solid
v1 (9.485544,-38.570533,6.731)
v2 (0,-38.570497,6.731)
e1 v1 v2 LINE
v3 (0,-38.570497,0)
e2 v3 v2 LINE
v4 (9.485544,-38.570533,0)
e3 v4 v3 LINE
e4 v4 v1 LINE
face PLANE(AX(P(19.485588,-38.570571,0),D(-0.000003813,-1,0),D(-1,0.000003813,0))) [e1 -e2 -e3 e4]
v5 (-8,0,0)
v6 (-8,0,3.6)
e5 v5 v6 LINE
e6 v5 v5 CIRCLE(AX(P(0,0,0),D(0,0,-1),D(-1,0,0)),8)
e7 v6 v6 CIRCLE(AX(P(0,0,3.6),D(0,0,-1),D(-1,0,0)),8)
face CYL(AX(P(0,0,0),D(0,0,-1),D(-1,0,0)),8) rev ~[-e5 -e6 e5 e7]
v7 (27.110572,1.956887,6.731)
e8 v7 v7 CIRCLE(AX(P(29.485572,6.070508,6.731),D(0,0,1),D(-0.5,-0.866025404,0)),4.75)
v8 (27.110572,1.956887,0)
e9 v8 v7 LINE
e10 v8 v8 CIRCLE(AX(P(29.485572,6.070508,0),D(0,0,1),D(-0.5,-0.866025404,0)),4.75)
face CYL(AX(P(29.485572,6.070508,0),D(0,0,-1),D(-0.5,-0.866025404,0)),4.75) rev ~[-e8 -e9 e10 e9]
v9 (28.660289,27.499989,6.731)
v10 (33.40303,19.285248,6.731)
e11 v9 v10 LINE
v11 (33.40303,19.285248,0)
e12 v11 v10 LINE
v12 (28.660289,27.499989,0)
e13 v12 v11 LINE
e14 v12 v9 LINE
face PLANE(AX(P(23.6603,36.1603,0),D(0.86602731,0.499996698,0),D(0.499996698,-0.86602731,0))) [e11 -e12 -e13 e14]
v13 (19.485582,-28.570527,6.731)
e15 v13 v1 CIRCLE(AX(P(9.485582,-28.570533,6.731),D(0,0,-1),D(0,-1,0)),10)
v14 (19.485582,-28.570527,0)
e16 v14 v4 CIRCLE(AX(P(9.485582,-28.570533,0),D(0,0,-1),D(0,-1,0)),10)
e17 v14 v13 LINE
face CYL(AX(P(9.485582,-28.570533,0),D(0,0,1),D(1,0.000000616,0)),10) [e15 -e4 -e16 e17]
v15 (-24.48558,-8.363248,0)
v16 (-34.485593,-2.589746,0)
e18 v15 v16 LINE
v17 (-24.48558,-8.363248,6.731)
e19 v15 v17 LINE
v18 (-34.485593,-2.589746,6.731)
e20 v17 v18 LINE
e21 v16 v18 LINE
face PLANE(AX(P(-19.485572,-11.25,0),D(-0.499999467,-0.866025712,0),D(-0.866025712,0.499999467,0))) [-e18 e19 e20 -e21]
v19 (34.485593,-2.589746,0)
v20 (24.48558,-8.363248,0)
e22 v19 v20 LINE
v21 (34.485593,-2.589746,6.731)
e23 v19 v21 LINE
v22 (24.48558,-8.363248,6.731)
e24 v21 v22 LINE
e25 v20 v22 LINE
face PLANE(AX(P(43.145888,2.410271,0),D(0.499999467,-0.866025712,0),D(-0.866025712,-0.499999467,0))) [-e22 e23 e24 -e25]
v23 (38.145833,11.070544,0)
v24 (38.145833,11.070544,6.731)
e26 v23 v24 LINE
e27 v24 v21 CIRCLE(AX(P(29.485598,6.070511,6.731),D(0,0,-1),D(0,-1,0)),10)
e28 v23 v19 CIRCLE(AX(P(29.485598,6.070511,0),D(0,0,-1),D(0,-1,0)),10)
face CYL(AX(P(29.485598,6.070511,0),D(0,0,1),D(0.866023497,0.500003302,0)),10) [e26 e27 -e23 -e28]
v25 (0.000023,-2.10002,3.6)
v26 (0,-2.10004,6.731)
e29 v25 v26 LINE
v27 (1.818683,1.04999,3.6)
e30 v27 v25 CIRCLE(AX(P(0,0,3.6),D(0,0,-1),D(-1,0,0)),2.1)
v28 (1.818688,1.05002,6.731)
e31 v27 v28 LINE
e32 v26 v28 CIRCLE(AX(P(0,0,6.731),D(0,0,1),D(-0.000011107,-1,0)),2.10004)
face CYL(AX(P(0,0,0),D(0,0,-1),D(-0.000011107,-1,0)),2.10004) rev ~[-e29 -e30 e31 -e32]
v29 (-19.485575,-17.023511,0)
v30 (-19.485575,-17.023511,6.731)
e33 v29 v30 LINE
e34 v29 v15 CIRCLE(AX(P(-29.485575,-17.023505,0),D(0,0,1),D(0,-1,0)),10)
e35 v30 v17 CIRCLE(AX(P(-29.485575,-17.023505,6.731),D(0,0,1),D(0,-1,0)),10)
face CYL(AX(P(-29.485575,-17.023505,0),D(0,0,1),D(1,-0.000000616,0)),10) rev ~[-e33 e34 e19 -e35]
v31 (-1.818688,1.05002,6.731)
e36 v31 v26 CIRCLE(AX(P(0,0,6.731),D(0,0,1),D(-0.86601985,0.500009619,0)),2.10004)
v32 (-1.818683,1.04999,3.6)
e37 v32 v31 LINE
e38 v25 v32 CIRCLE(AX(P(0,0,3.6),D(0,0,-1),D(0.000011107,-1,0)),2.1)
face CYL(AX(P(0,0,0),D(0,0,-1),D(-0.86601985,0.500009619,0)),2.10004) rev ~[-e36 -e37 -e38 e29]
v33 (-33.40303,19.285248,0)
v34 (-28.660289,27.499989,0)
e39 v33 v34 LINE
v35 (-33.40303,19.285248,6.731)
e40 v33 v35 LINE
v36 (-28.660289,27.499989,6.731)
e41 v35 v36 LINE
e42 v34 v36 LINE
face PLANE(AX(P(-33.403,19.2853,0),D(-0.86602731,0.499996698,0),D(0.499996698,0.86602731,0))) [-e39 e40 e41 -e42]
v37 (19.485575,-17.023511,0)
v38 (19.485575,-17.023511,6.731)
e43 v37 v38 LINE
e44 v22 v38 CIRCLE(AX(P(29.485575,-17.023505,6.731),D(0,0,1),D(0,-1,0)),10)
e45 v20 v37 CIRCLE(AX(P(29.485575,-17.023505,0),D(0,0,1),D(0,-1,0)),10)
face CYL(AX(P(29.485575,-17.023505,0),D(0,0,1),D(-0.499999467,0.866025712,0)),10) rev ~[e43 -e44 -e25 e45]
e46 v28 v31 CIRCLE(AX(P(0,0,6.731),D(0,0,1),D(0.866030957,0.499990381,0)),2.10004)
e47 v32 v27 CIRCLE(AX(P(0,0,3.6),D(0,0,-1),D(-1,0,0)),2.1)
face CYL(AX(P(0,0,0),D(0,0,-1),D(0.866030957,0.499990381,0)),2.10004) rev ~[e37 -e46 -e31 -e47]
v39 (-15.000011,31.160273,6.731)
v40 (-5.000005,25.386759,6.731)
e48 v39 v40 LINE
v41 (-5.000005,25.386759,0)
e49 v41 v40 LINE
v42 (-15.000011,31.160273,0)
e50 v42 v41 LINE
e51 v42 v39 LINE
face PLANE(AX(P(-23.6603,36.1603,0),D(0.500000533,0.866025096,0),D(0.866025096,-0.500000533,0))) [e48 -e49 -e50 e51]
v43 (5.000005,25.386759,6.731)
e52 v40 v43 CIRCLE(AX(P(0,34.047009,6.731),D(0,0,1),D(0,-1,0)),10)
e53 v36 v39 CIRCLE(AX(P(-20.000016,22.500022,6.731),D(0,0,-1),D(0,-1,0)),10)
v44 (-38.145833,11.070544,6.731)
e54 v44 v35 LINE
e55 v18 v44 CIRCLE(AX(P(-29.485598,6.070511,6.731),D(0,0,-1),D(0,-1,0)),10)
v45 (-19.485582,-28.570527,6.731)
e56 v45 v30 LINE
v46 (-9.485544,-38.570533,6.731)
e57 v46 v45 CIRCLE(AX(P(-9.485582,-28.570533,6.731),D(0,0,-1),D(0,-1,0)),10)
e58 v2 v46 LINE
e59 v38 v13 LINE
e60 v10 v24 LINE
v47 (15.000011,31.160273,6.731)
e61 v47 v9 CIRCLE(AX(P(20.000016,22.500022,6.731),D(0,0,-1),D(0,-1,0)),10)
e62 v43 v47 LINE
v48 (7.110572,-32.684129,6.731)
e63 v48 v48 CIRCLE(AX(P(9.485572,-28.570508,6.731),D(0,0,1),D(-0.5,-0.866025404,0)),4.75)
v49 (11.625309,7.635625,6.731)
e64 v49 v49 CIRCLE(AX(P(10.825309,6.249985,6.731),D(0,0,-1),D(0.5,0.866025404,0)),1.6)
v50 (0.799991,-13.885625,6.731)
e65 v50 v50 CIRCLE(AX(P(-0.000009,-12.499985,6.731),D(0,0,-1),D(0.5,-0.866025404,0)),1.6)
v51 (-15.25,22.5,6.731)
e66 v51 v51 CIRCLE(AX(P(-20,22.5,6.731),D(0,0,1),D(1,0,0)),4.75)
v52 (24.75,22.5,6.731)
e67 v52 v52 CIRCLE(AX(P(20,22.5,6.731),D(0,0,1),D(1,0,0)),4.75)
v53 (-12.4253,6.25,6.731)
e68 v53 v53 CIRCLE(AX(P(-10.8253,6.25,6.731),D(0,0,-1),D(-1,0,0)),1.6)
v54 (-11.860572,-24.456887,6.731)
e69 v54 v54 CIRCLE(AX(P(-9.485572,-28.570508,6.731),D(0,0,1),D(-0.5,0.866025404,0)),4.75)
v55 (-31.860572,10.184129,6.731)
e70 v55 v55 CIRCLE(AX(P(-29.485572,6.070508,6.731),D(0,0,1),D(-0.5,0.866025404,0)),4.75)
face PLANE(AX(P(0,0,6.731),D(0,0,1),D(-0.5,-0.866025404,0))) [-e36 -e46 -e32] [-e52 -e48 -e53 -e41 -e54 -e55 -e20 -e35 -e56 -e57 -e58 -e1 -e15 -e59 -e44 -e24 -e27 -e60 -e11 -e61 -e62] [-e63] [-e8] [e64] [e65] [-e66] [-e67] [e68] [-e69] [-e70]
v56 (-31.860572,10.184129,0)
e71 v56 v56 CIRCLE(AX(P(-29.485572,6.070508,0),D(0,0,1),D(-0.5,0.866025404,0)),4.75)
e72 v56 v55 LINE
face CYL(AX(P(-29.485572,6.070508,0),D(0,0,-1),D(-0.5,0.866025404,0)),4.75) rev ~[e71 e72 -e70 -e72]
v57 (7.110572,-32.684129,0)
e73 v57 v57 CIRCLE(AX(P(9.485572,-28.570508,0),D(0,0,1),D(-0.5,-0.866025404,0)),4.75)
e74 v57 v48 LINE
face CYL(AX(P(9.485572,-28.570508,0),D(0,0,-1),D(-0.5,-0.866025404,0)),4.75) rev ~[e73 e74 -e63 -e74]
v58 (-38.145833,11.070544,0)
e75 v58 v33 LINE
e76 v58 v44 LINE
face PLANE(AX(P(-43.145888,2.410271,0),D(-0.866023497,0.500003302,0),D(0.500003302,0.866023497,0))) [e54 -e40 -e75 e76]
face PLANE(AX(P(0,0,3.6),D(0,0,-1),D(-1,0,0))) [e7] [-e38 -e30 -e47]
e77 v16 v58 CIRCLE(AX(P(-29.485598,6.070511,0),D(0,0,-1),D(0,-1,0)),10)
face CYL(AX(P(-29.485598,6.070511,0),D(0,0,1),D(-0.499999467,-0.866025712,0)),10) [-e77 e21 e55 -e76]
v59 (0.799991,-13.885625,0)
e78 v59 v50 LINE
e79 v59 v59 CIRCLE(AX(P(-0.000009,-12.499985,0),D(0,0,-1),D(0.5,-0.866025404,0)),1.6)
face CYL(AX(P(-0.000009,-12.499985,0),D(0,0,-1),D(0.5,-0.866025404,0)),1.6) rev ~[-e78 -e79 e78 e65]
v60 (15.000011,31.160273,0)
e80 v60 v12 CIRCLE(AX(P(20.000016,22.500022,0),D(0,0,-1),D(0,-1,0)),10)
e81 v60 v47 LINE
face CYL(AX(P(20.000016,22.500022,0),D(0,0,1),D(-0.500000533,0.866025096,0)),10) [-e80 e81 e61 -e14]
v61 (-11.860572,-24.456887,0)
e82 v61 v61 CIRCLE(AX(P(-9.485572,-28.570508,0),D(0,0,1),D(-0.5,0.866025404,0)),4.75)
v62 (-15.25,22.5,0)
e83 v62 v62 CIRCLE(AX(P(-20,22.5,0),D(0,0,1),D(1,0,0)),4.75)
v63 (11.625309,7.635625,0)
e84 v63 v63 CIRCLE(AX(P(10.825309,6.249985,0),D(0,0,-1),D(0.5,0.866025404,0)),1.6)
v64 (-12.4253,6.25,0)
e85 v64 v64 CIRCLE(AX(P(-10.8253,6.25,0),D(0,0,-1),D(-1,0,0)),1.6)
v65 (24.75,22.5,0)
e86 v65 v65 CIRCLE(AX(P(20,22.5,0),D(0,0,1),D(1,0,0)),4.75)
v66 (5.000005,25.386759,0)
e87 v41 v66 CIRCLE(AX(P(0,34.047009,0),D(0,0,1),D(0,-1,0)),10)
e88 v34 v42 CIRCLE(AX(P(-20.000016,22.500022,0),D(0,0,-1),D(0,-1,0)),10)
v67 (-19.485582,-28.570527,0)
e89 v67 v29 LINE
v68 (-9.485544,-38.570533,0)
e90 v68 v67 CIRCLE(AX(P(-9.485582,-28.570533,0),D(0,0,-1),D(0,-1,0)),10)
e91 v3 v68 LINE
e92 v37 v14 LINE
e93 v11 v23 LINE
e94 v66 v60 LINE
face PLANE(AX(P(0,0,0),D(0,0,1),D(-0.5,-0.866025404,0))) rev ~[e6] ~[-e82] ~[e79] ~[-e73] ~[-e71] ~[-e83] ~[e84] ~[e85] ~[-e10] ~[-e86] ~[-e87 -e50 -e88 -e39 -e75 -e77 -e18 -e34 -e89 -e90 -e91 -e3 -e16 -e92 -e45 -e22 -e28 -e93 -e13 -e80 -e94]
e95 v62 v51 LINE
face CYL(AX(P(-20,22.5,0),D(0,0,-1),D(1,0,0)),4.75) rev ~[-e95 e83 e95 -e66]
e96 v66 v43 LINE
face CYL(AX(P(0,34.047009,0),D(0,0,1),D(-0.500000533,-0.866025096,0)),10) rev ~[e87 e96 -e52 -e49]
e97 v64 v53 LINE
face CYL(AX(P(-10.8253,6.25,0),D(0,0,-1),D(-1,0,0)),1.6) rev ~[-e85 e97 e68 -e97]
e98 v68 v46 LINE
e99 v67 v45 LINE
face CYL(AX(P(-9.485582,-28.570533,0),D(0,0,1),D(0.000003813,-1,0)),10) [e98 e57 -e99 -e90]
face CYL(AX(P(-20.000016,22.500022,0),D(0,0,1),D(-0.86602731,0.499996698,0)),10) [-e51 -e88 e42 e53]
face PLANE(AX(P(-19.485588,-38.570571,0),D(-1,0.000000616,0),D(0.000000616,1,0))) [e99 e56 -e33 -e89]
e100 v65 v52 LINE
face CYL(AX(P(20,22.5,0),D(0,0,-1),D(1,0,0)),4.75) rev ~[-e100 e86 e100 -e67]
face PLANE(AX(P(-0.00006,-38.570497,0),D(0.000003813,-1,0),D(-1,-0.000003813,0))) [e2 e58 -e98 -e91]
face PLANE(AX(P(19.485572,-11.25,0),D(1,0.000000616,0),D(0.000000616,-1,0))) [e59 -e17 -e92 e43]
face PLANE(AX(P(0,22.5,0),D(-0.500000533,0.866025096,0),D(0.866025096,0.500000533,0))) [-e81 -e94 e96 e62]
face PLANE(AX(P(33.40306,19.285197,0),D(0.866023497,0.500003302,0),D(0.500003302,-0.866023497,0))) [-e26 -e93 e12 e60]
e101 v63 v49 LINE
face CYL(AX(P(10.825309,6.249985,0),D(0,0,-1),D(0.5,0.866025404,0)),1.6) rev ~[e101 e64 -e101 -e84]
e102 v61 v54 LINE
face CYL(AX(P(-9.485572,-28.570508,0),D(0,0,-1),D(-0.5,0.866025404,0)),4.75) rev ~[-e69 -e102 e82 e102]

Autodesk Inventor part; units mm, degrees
ref_plane "YZ Plane" through (0, 0, 0) normal (1, 0, 0) x (0, 1, 0)
ref_plane "XZ Plane" through (0, 0, 0) normal (0, 1, 0) x (-1, 0, 0)
ref_plane "XY Plane" through (0, 0, 0) normal (0, 0, 1) x (1, 0, 0)
sketch "Sketch1" plane through (0, 0, 0) normal (0, 0, 1) x (1, 0, 0)
  line L0 (0, 0) -> (-33.403, 19.2853)
  line L1 (0, 0) -> (33.403, 19.2853)
  arc A0 (1.8187, 1.05) -> (-1.8187, 1.05) centre (0, 0) ccw
  circle A1 centre (-20, 22.5) radius 4.75
  circle A2 centre (20, 22.5) radius 4.75
  line L2 (0, 0) -> (-27.7881, 0)
  line L3 (-33.403, 19.2853) -> (-23.6603, 36.1603)
  line L4 (23.6603, 36.1603) -> (33.403, 19.2853)
  line L5 (-23.6603, 36.1603) -> (0, 22.5)
  line L6 (0, 22.5) -> (23.6603, 36.1603)
  dimension "d0" = 120
  dimension "d1" = 2.1
  dimension "d2" = 9.5
  dimension "d3" = 40
  dimension "d4" = 20
  dimension "d5" = 22.5
  dimension "d6" = 30
  dimension "d10" = 10
  dimension "d30" = 10
extrude "Extrusion1" add sketch "Sketch1" along normal blind 6.731 contours L0 L3 L5 L6 L4 L1 A0
fillet "Fillet1" radius 10 3 edges at (-23.6603, 36.1603, 3.3655) (23.6603, 36.1603, 3.3655) (0, 22.5, 3.3655)
pattern_circular "Circular Pattern1" count 3 over 360 about axis through (0, 0, 0) along (0, 0, 1) of "Extrusion1", "Fillet1"
sketch "Sketch2" plane through (0, 0, 0) normal (0, 0, -1) x (-1, 0, 0)
  circle A0 centre (0, 0) radius 2.1 projected
  circle A1 centre (10.8253, 6.25) radius 1.6
  line L0 (19.4856, -17.0235) -> (19.4856, -28.5705) projected
  line L1 (10.8253, 6.25) -> (0, 0) construction
  line L2 (0, 0) -> (15.25, 0) construction
  point P0 (19.4856, -18.9295)
  dimension "d18" = 3.2
  dimension "d20" = 12.5
  dimension "d33" = 30
extrude "Extrusion2" cut sketch "Sketch2" against normal up to next contours A1
pattern_circular "Circular Pattern2" count 3 over 360 about axis through (0, 0, 0) along (0, 0, 1) of "Extrusion2"
sketch "Sketch3" plane through (0, 0, 0) normal (0, 0, -1) x (-1, 0, 0)
  circle A0 centre (0, 0) radius 2.1 projected
  circle A1 centre (0, 0) radius 8
  dimension "d26" = 16
extrude "Extrusion3" cut sketch "Sketch3" against normal blind 3.6
equation "\"d2\" = MAGDIA"
equation "\"d4\" = 0.5 * d3"
equation "\"d30\" = d10"
equation "\"d12\" = THICKB"
equation "\"d21\" = THICKB"
equation "\"THICKA\" = 3.175"
equation "\"THICKB\" = 6.731"
equation "\"THICKC\" = 12.7"
equation "\"MAGDIA\" = 9.5"
equation "\"BALLDIA\" = 12"
equation "\"THICKPLY\" = 5"
properties part number "Effector_Platform_V2"
